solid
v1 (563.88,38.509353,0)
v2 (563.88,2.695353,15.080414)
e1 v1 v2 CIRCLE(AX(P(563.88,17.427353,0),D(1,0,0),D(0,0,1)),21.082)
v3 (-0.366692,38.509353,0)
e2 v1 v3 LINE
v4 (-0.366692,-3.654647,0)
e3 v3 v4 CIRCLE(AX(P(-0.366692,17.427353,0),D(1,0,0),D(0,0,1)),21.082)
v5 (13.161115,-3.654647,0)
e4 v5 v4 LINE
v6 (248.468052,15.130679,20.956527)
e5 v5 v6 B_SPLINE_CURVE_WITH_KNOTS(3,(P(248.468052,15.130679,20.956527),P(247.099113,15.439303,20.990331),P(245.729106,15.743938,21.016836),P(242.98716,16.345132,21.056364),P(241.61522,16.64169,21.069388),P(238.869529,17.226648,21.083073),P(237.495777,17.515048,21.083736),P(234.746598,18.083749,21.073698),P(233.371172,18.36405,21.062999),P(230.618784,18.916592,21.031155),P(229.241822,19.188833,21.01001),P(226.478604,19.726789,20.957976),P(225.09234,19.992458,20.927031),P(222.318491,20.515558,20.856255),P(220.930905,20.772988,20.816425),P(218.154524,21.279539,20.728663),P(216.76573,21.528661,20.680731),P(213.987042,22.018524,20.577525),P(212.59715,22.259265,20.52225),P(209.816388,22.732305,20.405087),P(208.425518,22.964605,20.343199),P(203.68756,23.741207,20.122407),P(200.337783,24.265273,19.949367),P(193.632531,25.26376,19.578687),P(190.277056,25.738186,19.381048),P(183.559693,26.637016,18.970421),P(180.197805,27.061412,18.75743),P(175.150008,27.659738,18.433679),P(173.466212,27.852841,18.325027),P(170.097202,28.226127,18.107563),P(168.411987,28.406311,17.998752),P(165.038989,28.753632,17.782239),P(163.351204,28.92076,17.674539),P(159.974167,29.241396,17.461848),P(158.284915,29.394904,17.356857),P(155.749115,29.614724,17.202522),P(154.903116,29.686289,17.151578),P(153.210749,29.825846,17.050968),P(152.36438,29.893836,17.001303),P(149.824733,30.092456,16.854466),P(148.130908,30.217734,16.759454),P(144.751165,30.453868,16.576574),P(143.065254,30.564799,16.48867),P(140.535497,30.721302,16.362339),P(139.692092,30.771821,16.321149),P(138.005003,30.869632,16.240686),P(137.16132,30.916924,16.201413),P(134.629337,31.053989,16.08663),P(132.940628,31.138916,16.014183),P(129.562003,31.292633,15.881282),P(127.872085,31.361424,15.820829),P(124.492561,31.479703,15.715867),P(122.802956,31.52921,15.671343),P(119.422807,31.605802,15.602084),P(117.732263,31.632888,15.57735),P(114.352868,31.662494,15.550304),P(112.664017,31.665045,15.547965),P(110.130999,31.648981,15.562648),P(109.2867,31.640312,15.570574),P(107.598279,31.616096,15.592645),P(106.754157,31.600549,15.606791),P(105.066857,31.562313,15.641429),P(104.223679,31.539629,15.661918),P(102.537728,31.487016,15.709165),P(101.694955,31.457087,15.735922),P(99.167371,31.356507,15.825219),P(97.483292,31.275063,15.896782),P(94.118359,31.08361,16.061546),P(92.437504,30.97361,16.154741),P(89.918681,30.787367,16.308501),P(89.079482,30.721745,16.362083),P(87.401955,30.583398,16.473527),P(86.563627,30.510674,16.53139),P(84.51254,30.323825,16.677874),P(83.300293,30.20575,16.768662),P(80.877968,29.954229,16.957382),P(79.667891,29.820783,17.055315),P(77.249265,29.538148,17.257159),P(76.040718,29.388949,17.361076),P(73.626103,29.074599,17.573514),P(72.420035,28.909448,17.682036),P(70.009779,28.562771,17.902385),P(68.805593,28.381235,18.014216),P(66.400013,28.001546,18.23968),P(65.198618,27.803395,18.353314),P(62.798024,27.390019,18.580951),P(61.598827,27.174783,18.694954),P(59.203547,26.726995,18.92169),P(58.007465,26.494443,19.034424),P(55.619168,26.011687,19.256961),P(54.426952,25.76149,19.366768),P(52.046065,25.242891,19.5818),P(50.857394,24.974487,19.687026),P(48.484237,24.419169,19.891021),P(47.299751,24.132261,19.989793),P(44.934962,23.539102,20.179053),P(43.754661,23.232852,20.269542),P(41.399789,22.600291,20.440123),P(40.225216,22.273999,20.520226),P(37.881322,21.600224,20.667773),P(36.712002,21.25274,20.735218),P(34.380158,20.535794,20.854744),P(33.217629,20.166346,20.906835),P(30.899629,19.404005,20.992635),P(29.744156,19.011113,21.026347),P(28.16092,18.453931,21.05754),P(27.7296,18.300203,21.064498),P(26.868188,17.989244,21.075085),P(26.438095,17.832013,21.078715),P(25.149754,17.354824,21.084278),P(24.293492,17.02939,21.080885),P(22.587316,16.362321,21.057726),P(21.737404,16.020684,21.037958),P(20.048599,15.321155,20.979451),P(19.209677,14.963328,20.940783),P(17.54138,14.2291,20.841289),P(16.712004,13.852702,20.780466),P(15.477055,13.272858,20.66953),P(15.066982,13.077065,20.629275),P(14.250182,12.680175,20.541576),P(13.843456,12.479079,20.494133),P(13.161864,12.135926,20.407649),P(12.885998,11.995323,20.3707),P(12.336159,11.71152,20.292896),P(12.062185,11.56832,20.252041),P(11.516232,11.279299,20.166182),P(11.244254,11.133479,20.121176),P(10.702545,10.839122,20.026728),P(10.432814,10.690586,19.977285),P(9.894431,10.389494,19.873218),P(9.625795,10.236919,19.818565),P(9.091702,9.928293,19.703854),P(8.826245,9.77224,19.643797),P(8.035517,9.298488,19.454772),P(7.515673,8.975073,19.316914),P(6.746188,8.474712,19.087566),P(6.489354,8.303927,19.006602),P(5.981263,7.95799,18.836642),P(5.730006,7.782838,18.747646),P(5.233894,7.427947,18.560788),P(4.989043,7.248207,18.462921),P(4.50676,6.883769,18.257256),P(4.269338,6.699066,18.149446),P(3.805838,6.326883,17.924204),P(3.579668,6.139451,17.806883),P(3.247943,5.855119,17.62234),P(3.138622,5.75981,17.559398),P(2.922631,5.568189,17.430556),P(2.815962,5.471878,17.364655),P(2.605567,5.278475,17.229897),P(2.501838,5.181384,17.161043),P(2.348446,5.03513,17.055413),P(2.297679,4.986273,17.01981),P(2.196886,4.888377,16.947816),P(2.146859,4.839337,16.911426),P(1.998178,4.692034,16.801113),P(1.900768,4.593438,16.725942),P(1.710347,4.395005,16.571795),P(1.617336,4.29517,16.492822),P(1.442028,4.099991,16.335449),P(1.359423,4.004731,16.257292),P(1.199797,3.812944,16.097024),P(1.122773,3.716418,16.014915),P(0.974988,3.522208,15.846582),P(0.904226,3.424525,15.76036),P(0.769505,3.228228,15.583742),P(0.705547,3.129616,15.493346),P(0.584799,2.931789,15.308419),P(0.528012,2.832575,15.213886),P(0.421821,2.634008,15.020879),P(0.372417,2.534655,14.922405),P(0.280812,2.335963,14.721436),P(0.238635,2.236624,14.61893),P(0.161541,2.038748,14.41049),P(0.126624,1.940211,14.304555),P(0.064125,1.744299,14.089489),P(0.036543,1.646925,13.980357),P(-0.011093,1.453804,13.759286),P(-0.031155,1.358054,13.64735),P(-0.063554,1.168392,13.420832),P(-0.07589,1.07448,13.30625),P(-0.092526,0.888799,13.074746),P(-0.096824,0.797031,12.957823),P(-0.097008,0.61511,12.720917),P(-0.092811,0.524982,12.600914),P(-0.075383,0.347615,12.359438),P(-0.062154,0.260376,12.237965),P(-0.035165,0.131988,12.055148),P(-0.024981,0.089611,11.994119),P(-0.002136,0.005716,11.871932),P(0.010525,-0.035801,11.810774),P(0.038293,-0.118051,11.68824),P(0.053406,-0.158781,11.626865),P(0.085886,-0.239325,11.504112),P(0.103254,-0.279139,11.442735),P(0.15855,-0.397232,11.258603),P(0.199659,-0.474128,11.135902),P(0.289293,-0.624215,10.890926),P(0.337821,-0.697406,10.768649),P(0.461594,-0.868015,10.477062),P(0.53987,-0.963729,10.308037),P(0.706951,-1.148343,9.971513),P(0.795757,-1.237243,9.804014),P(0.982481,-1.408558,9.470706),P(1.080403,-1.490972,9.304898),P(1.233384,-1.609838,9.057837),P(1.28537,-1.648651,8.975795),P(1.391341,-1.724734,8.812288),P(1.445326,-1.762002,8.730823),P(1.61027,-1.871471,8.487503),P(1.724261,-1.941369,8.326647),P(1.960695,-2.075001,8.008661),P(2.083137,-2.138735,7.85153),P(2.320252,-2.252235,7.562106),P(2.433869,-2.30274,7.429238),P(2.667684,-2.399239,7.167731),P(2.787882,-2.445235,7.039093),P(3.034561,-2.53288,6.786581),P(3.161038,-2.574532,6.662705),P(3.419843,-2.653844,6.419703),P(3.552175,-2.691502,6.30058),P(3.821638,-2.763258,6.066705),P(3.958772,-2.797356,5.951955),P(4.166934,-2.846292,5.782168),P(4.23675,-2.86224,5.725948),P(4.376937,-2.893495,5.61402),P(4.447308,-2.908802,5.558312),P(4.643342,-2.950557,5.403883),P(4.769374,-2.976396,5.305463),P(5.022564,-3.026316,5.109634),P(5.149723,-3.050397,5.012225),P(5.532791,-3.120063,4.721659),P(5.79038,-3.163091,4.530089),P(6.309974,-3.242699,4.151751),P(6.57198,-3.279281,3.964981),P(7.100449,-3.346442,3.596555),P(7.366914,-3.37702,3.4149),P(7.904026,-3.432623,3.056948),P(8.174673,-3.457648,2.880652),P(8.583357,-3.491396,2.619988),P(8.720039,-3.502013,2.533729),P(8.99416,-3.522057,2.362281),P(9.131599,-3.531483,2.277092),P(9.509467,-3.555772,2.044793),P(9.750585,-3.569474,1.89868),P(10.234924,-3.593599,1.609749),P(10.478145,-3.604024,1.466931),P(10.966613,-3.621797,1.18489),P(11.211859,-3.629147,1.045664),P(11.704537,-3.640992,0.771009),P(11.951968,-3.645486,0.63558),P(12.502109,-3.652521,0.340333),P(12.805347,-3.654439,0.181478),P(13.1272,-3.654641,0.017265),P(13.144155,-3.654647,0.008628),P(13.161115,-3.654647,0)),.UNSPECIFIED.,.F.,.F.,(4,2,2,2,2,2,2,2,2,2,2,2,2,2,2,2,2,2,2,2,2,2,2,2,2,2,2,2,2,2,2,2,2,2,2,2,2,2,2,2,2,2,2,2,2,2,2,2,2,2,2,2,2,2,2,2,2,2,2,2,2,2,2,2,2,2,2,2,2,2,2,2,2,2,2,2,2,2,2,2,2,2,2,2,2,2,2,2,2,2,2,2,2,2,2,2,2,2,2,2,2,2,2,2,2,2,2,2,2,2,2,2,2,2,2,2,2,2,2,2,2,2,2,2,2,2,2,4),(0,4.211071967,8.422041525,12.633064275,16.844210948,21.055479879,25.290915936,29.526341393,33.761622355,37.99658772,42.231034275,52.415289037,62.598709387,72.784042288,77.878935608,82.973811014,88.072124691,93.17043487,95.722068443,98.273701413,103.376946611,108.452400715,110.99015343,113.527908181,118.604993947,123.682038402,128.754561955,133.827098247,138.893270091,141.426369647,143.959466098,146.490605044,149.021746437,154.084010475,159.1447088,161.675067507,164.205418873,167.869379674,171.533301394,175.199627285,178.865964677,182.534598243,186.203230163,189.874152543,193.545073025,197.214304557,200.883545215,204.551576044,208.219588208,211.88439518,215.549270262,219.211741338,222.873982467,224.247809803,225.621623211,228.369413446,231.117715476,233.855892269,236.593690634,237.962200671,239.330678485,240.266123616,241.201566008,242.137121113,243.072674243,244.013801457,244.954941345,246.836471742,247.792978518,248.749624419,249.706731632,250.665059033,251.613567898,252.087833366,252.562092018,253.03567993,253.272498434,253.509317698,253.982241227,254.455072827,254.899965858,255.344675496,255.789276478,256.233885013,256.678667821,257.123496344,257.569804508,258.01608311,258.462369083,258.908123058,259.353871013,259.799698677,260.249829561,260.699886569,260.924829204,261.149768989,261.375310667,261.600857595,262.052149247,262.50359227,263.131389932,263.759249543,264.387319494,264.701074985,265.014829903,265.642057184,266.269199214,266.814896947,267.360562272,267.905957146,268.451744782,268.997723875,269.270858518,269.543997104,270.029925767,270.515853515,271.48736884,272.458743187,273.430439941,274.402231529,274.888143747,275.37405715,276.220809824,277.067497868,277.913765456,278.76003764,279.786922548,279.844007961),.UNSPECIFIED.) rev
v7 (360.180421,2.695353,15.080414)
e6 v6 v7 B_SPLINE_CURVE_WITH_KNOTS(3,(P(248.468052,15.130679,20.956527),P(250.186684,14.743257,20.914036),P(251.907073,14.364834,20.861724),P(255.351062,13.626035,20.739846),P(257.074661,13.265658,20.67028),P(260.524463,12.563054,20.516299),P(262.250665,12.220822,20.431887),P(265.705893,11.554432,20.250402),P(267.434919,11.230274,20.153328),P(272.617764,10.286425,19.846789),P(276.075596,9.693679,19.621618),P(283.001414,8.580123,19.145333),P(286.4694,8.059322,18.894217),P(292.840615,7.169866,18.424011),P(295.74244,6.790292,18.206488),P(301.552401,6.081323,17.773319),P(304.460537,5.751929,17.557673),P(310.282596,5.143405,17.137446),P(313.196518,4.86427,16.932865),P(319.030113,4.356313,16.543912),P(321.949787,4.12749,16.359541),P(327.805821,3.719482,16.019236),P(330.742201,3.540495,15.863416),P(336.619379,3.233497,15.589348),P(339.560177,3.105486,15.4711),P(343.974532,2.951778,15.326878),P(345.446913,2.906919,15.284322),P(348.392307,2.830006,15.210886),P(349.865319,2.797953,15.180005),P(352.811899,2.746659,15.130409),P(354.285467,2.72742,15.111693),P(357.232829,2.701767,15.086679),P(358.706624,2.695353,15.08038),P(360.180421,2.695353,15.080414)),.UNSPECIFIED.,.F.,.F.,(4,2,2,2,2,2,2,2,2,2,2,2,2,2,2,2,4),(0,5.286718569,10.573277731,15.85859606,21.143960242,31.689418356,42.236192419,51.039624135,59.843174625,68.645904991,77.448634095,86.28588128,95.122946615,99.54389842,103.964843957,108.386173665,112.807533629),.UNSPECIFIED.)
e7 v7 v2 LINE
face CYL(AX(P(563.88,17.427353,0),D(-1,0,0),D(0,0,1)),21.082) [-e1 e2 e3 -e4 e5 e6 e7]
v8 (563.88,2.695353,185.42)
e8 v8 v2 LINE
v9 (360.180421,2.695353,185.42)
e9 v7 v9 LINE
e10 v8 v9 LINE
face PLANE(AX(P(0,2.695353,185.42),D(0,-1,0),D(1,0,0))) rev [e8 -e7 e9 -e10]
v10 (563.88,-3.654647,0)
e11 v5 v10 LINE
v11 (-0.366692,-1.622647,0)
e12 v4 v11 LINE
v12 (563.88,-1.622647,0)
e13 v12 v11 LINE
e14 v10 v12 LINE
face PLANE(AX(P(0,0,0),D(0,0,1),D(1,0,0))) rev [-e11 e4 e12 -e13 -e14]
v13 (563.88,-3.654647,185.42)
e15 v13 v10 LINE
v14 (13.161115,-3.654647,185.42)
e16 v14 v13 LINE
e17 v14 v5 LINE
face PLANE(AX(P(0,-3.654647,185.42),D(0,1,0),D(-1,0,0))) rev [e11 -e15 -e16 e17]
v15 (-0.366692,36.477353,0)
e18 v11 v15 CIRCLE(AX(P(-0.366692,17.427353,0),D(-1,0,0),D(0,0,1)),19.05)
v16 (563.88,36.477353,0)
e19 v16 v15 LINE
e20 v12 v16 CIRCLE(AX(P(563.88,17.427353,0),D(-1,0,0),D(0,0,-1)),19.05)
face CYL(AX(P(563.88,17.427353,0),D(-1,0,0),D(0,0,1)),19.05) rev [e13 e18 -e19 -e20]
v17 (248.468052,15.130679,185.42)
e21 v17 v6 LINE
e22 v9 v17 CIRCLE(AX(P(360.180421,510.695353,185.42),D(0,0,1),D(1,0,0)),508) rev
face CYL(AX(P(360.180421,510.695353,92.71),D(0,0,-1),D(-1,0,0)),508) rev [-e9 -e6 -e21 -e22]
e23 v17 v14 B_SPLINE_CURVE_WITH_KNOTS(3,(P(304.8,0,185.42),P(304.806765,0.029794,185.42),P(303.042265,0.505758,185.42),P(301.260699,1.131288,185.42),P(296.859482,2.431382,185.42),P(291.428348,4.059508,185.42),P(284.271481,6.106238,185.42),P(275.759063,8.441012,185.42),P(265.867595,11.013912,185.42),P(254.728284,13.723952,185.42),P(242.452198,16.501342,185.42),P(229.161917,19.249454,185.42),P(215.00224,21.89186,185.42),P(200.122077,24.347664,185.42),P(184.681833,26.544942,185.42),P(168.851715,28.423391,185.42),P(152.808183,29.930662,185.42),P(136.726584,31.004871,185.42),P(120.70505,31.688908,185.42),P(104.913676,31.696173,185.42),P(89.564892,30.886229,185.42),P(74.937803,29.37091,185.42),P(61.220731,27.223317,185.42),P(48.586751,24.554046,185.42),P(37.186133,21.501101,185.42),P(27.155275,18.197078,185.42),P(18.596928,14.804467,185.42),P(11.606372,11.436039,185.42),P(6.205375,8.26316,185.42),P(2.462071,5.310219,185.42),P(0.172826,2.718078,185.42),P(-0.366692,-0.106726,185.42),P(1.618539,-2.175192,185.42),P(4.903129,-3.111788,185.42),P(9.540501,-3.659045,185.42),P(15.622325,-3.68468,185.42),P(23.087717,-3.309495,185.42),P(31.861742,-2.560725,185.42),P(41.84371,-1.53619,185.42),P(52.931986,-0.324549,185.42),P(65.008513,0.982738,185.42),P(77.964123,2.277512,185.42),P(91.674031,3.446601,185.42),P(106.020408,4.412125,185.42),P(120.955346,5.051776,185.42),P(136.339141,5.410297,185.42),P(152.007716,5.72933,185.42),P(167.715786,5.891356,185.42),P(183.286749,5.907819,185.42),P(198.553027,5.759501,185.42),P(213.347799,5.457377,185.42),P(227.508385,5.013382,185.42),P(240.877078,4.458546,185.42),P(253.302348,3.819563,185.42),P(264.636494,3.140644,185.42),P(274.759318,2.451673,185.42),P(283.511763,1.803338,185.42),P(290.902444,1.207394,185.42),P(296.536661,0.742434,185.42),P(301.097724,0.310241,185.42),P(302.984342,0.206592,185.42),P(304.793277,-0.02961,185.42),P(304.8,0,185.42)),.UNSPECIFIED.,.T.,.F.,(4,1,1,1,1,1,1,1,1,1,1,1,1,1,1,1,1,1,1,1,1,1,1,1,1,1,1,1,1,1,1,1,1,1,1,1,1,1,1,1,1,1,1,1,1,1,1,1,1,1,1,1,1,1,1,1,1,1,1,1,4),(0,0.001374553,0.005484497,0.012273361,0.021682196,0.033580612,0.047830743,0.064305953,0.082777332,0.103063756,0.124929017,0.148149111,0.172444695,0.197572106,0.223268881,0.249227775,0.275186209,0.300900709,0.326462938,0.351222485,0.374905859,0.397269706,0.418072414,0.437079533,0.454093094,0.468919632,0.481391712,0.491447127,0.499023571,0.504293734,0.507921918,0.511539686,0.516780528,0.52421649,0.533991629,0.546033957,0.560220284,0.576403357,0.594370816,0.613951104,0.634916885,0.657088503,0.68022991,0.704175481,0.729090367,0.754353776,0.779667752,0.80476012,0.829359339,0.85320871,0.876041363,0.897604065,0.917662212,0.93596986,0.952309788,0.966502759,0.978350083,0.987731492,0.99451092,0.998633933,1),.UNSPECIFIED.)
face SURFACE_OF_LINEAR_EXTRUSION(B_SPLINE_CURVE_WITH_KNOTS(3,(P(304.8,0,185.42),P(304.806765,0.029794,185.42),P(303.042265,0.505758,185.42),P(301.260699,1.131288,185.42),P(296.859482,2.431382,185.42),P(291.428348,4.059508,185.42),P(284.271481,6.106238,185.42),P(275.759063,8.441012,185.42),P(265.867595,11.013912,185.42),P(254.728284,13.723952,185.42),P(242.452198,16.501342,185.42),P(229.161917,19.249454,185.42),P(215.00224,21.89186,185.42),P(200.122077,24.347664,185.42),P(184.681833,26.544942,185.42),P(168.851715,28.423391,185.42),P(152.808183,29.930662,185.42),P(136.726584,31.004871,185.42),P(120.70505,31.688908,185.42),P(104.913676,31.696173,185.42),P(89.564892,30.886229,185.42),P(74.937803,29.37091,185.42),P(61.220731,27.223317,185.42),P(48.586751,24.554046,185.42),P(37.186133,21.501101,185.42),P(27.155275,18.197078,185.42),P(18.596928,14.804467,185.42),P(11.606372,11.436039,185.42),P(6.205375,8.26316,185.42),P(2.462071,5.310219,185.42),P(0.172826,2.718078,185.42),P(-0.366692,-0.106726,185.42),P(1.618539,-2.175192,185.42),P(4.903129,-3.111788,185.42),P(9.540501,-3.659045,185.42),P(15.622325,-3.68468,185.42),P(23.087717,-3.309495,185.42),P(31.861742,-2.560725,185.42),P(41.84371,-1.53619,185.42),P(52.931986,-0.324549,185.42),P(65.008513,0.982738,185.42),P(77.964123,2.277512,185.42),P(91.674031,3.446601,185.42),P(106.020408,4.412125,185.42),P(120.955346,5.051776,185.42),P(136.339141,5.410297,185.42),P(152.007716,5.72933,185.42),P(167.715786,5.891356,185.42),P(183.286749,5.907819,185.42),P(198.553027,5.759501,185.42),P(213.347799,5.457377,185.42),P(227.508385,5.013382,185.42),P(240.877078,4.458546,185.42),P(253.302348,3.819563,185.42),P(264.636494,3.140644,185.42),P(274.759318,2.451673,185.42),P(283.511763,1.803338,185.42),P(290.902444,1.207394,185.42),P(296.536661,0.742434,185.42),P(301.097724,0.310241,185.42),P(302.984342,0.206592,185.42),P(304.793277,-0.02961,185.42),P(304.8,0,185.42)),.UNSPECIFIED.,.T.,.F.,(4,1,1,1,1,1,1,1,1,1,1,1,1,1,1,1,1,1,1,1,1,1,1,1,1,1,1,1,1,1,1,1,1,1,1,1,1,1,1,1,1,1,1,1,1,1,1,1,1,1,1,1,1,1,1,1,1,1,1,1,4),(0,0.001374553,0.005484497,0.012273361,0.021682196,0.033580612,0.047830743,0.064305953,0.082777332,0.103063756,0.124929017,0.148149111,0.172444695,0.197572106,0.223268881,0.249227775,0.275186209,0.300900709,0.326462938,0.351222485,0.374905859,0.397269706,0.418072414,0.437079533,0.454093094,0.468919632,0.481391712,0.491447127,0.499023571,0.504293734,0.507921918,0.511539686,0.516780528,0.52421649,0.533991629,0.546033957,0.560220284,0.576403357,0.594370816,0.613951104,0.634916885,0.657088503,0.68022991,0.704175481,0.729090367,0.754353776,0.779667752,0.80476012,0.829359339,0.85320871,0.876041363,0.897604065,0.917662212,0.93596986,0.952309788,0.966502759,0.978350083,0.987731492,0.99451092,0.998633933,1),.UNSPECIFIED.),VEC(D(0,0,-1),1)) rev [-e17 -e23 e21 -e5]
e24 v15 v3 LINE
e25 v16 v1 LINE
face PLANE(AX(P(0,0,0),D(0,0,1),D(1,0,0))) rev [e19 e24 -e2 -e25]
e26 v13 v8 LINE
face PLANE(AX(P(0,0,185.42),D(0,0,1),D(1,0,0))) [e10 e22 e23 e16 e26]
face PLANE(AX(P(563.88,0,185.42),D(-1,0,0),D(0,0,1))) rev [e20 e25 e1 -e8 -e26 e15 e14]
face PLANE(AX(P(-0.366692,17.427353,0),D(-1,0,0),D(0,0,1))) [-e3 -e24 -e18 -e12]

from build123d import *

# Parameters (mm, degrees)
BOSS_EXTRUDE1_DEPTH     = 185.42
FILLET1_R               = 508
BOSS_EXTRUDE2_START     = -0.366692026
BOSS_EXTRUDE2_DEPTH     = 564.246692026
CUT_EXTRUDE1_DEPTH      = 596.178860778
CUT_EXTRUDE1_DEPTH_BACK = 596.178860778


# Read off the part's stored shape, not the designer's step: Boss-Extrude2
with BuildPart() as part:
    # Sketch1 → Boss-Extrude1 (new body)
    with BuildSketch(Plane.XY):
        with BuildLine():
            add(Edge.make_bspline(
                [(13.161115253, -3.654646631), (13.823623725, -3.654646631), (16.987832029, -3.616054402), (23.087716531, -3.309495072), (31.861742479, -2.560725044), (41.843709875, -1.536189628), (52.931986121, -0.324549043), (65.008512648, 0.982737613), (77.964122557, 2.277511633), (91.674031486, 3.446601281), (106.020407657, 4.412124839), (120.955345623, 5.051776243), (136.33914131, 5.410297234), (152.00771634, 5.729330171), (167.715786189, 5.891355535), (183.286749283, 5.907819478), (198.553027185, 5.759500833), (213.347799024, 5.457376615), (227.508384674, 5.013382487), (240.87707765, 4.458546495), (253.302348042, 3.819562542), (264.636493621, 3.140644353), (274.759317931, 2.451673351), (283.511762664, 1.803338009), (290.902443864, 1.207394425), (296.53666063, 0.74243374), (301.097723542, 0.310240549), (302.984341567, 0.206591886), (304.793276654, -0.029609745), (304.8, 0)],
                knots=[0.530802003, 0.530802003, 0.530802003, 0.530802003, 0.533991629, 0.546033957, 0.560220284, 0.576403357, 0.594370816, 0.613951104, 0.634916885, 0.657088503, 0.68022991, 0.704175481, 0.729090367, 0.754353776, 0.779667752, 0.80476012, 0.829359339, 0.85320871, 0.876041363, 0.897604065, 0.917662212, 0.93596986, 0.952309788, 0.966502759, 0.978350083, 0.987731492, 0.99451092, 0.998633933, 1, 1, 1, 1], degree=3))
            Line((13.161115253, -3.654646631), (563.88, -3.654646631))
            Line((563.88, -3.654646631), (563.88, 2.695353369))
            Line((563.88, 2.695353369), (295.985175517, 2.695353369))
            add(Edge.make_bspline(
                [(304.8, 0), (304.806765113, 0.029793691), (303.042265442, 0.505757681), (301.260699108, 1.131288287), (298.363634875, 1.98706409), (296.481226949, 2.547598218), (295.985175517, 2.695353369)],
                knots=[0, 0, 0, 0, 0.001374553, 0.005484497, 0.012273361, 0.014741887, 0.014741887, 0.014741887, 0.014741887], degree=3))
        make_face()
        with BuildLine():
            add(Edge.make_bspline(
                [(304.8, 0), (304.806765113, 0.029793691), (303.042265442, 0.505757681), (301.260699108, 1.131288287), (296.859481645, 2.431382143), (291.428347564, 4.059507507), (284.27148123, 6.106238287), (275.759062516, 8.441011906), (265.86759503, 11.013912173), (254.728284103, 13.723951628), (242.452197766, 16.50134202), (229.161916523, 19.249453844), (215.002240334, 21.891859808), (200.122077246, 24.347664434), (184.681833302, 26.544941892), (168.851714948, 28.423390706), (152.808183209, 29.930661937), (136.726583629, 31.004871005), (120.70505044, 31.68890838), (104.913675716, 31.696173318), (89.564892405, 30.886228683), (74.937803443, 29.370910292), (61.220730955, 27.223316908), (48.586751334, 24.554045511), (37.186133391, 21.501101472), (27.155274661, 18.197077887), (18.596928301, 14.804467146), (11.606371729, 11.436038832), (6.205374616, 8.263160289), (2.462071155, 5.310219357), (0.172825892, 2.718078099), (-0.366692026, -0.10672571), (1.618538644, -2.175191533), (4.903129138, -3.111787797), (9.54050067, -3.659044511), (15.622325024, -3.684680114), (23.087716531, -3.309495072), (31.861742479, -2.560725044), (41.843709875, -1.536189628), (52.931986121, -0.324549043), (65.008512648, 0.982737613), (77.964122557, 2.277511633), (91.674031486, 3.446601281), (106.020407657, 4.412124839), (120.955345623, 5.051776243), (136.33914131, 5.410297234), (152.00771634, 5.729330171), (167.715786189, 5.891355535), (183.286749283, 5.907819478), (198.553027185, 5.759500833), (213.347799024, 5.457376615), (227.508384674, 5.013382487), (240.87707765, 4.458546495), (253.302348042, 3.819562542), (264.636493621, 3.140644353), (274.759317931, 2.451673351), (283.511762664, 1.803338009), (290.902443864, 1.207394425), (296.53666063, 0.74243374), (301.097723542, 0.310240549), (302.984341567, 0.206591886), (304.793276654, -0.029609745), (304.8, 0)],
                knots=[0, 0, 0, 0, 0.001374553, 0.005484497, 0.012273361, 0.021682196, 0.033580612, 0.047830743, 0.064305953, 0.082777332, 0.103063756, 0.124929017, 0.148149111, 0.172444695, 0.197572106, 0.223268881, 0.249227775, 0.275186209, 0.300900709, 0.326462938, 0.351222485, 0.374905859, 0.397269706, 0.418072414, 0.437079533, 0.454093094, 0.468919632, 0.481391712, 0.491447127, 0.499023571, 0.504293734, 0.507921918, 0.511539686, 0.516780528, 0.52421649, 0.533991629, 0.546033957, 0.560220284, 0.576403357, 0.594370816, 0.613951104, 0.634916885, 0.657088503, 0.68022991, 0.704175481, 0.729090367, 0.754353776, 0.779667752, 0.80476012, 0.829359339, 0.85320871, 0.876041363, 0.897604065, 0.917662212, 0.93596986, 0.952309788, 0.966502759, 0.978350083, 0.987731492, 0.99451092, 0.998633933, 1, 1, 1, 1], degree=3))
        make_face()
    extrude(amount=BOSS_EXTRUDE1_DEPTH)

    # Fillet1
    fillet1_edges = [part.edges().sort_by_distance(p)[0] for p in [
        (295.985175517, 2.695353369, 92.71),
    ]]
    fillet(fillet1_edges, radius=FILLET1_R)

    # Boss-Extrude2 outline → Boss-Extrude2 (add)
    with BuildSketch(Plane(origin=(0, 0, 0), x_dir=(0, 0, -1), z_dir=(1, 0, 0)).offset(BOSS_EXTRUDE2_START)):
        with BuildLine():
            Line((0, -3.654646631), (0, 38.509353369))
            ThreePointArc((0, 38.509353369), (-21.082, 17.427353369), (0, -3.654646631))
        make_face()
    extrude(amount=BOSS_EXTRUDE2_DEPTH)

    # Sketch3 → Cut-Extrude1 (cut, two sides: drawn at the far end of the back side and taken through both)
    with BuildSketch(Plane.ZY.offset(0.366692026).offset(-CUT_EXTRUDE1_DEPTH_BACK)):
        with BuildLine():
            Line((0, 36.477353369), (0, -1.622646631))
            ThreePointArc((0, -1.622646631), (19.05, 17.427353369), (0, 36.477353369))
        make_face()
    extrude(amount=CUT_EXTRUDE1_DEPTH + CUT_EXTRUDE1_DEPTH_BACK, mode=Mode.SUBTRACT)


solid = part.part
